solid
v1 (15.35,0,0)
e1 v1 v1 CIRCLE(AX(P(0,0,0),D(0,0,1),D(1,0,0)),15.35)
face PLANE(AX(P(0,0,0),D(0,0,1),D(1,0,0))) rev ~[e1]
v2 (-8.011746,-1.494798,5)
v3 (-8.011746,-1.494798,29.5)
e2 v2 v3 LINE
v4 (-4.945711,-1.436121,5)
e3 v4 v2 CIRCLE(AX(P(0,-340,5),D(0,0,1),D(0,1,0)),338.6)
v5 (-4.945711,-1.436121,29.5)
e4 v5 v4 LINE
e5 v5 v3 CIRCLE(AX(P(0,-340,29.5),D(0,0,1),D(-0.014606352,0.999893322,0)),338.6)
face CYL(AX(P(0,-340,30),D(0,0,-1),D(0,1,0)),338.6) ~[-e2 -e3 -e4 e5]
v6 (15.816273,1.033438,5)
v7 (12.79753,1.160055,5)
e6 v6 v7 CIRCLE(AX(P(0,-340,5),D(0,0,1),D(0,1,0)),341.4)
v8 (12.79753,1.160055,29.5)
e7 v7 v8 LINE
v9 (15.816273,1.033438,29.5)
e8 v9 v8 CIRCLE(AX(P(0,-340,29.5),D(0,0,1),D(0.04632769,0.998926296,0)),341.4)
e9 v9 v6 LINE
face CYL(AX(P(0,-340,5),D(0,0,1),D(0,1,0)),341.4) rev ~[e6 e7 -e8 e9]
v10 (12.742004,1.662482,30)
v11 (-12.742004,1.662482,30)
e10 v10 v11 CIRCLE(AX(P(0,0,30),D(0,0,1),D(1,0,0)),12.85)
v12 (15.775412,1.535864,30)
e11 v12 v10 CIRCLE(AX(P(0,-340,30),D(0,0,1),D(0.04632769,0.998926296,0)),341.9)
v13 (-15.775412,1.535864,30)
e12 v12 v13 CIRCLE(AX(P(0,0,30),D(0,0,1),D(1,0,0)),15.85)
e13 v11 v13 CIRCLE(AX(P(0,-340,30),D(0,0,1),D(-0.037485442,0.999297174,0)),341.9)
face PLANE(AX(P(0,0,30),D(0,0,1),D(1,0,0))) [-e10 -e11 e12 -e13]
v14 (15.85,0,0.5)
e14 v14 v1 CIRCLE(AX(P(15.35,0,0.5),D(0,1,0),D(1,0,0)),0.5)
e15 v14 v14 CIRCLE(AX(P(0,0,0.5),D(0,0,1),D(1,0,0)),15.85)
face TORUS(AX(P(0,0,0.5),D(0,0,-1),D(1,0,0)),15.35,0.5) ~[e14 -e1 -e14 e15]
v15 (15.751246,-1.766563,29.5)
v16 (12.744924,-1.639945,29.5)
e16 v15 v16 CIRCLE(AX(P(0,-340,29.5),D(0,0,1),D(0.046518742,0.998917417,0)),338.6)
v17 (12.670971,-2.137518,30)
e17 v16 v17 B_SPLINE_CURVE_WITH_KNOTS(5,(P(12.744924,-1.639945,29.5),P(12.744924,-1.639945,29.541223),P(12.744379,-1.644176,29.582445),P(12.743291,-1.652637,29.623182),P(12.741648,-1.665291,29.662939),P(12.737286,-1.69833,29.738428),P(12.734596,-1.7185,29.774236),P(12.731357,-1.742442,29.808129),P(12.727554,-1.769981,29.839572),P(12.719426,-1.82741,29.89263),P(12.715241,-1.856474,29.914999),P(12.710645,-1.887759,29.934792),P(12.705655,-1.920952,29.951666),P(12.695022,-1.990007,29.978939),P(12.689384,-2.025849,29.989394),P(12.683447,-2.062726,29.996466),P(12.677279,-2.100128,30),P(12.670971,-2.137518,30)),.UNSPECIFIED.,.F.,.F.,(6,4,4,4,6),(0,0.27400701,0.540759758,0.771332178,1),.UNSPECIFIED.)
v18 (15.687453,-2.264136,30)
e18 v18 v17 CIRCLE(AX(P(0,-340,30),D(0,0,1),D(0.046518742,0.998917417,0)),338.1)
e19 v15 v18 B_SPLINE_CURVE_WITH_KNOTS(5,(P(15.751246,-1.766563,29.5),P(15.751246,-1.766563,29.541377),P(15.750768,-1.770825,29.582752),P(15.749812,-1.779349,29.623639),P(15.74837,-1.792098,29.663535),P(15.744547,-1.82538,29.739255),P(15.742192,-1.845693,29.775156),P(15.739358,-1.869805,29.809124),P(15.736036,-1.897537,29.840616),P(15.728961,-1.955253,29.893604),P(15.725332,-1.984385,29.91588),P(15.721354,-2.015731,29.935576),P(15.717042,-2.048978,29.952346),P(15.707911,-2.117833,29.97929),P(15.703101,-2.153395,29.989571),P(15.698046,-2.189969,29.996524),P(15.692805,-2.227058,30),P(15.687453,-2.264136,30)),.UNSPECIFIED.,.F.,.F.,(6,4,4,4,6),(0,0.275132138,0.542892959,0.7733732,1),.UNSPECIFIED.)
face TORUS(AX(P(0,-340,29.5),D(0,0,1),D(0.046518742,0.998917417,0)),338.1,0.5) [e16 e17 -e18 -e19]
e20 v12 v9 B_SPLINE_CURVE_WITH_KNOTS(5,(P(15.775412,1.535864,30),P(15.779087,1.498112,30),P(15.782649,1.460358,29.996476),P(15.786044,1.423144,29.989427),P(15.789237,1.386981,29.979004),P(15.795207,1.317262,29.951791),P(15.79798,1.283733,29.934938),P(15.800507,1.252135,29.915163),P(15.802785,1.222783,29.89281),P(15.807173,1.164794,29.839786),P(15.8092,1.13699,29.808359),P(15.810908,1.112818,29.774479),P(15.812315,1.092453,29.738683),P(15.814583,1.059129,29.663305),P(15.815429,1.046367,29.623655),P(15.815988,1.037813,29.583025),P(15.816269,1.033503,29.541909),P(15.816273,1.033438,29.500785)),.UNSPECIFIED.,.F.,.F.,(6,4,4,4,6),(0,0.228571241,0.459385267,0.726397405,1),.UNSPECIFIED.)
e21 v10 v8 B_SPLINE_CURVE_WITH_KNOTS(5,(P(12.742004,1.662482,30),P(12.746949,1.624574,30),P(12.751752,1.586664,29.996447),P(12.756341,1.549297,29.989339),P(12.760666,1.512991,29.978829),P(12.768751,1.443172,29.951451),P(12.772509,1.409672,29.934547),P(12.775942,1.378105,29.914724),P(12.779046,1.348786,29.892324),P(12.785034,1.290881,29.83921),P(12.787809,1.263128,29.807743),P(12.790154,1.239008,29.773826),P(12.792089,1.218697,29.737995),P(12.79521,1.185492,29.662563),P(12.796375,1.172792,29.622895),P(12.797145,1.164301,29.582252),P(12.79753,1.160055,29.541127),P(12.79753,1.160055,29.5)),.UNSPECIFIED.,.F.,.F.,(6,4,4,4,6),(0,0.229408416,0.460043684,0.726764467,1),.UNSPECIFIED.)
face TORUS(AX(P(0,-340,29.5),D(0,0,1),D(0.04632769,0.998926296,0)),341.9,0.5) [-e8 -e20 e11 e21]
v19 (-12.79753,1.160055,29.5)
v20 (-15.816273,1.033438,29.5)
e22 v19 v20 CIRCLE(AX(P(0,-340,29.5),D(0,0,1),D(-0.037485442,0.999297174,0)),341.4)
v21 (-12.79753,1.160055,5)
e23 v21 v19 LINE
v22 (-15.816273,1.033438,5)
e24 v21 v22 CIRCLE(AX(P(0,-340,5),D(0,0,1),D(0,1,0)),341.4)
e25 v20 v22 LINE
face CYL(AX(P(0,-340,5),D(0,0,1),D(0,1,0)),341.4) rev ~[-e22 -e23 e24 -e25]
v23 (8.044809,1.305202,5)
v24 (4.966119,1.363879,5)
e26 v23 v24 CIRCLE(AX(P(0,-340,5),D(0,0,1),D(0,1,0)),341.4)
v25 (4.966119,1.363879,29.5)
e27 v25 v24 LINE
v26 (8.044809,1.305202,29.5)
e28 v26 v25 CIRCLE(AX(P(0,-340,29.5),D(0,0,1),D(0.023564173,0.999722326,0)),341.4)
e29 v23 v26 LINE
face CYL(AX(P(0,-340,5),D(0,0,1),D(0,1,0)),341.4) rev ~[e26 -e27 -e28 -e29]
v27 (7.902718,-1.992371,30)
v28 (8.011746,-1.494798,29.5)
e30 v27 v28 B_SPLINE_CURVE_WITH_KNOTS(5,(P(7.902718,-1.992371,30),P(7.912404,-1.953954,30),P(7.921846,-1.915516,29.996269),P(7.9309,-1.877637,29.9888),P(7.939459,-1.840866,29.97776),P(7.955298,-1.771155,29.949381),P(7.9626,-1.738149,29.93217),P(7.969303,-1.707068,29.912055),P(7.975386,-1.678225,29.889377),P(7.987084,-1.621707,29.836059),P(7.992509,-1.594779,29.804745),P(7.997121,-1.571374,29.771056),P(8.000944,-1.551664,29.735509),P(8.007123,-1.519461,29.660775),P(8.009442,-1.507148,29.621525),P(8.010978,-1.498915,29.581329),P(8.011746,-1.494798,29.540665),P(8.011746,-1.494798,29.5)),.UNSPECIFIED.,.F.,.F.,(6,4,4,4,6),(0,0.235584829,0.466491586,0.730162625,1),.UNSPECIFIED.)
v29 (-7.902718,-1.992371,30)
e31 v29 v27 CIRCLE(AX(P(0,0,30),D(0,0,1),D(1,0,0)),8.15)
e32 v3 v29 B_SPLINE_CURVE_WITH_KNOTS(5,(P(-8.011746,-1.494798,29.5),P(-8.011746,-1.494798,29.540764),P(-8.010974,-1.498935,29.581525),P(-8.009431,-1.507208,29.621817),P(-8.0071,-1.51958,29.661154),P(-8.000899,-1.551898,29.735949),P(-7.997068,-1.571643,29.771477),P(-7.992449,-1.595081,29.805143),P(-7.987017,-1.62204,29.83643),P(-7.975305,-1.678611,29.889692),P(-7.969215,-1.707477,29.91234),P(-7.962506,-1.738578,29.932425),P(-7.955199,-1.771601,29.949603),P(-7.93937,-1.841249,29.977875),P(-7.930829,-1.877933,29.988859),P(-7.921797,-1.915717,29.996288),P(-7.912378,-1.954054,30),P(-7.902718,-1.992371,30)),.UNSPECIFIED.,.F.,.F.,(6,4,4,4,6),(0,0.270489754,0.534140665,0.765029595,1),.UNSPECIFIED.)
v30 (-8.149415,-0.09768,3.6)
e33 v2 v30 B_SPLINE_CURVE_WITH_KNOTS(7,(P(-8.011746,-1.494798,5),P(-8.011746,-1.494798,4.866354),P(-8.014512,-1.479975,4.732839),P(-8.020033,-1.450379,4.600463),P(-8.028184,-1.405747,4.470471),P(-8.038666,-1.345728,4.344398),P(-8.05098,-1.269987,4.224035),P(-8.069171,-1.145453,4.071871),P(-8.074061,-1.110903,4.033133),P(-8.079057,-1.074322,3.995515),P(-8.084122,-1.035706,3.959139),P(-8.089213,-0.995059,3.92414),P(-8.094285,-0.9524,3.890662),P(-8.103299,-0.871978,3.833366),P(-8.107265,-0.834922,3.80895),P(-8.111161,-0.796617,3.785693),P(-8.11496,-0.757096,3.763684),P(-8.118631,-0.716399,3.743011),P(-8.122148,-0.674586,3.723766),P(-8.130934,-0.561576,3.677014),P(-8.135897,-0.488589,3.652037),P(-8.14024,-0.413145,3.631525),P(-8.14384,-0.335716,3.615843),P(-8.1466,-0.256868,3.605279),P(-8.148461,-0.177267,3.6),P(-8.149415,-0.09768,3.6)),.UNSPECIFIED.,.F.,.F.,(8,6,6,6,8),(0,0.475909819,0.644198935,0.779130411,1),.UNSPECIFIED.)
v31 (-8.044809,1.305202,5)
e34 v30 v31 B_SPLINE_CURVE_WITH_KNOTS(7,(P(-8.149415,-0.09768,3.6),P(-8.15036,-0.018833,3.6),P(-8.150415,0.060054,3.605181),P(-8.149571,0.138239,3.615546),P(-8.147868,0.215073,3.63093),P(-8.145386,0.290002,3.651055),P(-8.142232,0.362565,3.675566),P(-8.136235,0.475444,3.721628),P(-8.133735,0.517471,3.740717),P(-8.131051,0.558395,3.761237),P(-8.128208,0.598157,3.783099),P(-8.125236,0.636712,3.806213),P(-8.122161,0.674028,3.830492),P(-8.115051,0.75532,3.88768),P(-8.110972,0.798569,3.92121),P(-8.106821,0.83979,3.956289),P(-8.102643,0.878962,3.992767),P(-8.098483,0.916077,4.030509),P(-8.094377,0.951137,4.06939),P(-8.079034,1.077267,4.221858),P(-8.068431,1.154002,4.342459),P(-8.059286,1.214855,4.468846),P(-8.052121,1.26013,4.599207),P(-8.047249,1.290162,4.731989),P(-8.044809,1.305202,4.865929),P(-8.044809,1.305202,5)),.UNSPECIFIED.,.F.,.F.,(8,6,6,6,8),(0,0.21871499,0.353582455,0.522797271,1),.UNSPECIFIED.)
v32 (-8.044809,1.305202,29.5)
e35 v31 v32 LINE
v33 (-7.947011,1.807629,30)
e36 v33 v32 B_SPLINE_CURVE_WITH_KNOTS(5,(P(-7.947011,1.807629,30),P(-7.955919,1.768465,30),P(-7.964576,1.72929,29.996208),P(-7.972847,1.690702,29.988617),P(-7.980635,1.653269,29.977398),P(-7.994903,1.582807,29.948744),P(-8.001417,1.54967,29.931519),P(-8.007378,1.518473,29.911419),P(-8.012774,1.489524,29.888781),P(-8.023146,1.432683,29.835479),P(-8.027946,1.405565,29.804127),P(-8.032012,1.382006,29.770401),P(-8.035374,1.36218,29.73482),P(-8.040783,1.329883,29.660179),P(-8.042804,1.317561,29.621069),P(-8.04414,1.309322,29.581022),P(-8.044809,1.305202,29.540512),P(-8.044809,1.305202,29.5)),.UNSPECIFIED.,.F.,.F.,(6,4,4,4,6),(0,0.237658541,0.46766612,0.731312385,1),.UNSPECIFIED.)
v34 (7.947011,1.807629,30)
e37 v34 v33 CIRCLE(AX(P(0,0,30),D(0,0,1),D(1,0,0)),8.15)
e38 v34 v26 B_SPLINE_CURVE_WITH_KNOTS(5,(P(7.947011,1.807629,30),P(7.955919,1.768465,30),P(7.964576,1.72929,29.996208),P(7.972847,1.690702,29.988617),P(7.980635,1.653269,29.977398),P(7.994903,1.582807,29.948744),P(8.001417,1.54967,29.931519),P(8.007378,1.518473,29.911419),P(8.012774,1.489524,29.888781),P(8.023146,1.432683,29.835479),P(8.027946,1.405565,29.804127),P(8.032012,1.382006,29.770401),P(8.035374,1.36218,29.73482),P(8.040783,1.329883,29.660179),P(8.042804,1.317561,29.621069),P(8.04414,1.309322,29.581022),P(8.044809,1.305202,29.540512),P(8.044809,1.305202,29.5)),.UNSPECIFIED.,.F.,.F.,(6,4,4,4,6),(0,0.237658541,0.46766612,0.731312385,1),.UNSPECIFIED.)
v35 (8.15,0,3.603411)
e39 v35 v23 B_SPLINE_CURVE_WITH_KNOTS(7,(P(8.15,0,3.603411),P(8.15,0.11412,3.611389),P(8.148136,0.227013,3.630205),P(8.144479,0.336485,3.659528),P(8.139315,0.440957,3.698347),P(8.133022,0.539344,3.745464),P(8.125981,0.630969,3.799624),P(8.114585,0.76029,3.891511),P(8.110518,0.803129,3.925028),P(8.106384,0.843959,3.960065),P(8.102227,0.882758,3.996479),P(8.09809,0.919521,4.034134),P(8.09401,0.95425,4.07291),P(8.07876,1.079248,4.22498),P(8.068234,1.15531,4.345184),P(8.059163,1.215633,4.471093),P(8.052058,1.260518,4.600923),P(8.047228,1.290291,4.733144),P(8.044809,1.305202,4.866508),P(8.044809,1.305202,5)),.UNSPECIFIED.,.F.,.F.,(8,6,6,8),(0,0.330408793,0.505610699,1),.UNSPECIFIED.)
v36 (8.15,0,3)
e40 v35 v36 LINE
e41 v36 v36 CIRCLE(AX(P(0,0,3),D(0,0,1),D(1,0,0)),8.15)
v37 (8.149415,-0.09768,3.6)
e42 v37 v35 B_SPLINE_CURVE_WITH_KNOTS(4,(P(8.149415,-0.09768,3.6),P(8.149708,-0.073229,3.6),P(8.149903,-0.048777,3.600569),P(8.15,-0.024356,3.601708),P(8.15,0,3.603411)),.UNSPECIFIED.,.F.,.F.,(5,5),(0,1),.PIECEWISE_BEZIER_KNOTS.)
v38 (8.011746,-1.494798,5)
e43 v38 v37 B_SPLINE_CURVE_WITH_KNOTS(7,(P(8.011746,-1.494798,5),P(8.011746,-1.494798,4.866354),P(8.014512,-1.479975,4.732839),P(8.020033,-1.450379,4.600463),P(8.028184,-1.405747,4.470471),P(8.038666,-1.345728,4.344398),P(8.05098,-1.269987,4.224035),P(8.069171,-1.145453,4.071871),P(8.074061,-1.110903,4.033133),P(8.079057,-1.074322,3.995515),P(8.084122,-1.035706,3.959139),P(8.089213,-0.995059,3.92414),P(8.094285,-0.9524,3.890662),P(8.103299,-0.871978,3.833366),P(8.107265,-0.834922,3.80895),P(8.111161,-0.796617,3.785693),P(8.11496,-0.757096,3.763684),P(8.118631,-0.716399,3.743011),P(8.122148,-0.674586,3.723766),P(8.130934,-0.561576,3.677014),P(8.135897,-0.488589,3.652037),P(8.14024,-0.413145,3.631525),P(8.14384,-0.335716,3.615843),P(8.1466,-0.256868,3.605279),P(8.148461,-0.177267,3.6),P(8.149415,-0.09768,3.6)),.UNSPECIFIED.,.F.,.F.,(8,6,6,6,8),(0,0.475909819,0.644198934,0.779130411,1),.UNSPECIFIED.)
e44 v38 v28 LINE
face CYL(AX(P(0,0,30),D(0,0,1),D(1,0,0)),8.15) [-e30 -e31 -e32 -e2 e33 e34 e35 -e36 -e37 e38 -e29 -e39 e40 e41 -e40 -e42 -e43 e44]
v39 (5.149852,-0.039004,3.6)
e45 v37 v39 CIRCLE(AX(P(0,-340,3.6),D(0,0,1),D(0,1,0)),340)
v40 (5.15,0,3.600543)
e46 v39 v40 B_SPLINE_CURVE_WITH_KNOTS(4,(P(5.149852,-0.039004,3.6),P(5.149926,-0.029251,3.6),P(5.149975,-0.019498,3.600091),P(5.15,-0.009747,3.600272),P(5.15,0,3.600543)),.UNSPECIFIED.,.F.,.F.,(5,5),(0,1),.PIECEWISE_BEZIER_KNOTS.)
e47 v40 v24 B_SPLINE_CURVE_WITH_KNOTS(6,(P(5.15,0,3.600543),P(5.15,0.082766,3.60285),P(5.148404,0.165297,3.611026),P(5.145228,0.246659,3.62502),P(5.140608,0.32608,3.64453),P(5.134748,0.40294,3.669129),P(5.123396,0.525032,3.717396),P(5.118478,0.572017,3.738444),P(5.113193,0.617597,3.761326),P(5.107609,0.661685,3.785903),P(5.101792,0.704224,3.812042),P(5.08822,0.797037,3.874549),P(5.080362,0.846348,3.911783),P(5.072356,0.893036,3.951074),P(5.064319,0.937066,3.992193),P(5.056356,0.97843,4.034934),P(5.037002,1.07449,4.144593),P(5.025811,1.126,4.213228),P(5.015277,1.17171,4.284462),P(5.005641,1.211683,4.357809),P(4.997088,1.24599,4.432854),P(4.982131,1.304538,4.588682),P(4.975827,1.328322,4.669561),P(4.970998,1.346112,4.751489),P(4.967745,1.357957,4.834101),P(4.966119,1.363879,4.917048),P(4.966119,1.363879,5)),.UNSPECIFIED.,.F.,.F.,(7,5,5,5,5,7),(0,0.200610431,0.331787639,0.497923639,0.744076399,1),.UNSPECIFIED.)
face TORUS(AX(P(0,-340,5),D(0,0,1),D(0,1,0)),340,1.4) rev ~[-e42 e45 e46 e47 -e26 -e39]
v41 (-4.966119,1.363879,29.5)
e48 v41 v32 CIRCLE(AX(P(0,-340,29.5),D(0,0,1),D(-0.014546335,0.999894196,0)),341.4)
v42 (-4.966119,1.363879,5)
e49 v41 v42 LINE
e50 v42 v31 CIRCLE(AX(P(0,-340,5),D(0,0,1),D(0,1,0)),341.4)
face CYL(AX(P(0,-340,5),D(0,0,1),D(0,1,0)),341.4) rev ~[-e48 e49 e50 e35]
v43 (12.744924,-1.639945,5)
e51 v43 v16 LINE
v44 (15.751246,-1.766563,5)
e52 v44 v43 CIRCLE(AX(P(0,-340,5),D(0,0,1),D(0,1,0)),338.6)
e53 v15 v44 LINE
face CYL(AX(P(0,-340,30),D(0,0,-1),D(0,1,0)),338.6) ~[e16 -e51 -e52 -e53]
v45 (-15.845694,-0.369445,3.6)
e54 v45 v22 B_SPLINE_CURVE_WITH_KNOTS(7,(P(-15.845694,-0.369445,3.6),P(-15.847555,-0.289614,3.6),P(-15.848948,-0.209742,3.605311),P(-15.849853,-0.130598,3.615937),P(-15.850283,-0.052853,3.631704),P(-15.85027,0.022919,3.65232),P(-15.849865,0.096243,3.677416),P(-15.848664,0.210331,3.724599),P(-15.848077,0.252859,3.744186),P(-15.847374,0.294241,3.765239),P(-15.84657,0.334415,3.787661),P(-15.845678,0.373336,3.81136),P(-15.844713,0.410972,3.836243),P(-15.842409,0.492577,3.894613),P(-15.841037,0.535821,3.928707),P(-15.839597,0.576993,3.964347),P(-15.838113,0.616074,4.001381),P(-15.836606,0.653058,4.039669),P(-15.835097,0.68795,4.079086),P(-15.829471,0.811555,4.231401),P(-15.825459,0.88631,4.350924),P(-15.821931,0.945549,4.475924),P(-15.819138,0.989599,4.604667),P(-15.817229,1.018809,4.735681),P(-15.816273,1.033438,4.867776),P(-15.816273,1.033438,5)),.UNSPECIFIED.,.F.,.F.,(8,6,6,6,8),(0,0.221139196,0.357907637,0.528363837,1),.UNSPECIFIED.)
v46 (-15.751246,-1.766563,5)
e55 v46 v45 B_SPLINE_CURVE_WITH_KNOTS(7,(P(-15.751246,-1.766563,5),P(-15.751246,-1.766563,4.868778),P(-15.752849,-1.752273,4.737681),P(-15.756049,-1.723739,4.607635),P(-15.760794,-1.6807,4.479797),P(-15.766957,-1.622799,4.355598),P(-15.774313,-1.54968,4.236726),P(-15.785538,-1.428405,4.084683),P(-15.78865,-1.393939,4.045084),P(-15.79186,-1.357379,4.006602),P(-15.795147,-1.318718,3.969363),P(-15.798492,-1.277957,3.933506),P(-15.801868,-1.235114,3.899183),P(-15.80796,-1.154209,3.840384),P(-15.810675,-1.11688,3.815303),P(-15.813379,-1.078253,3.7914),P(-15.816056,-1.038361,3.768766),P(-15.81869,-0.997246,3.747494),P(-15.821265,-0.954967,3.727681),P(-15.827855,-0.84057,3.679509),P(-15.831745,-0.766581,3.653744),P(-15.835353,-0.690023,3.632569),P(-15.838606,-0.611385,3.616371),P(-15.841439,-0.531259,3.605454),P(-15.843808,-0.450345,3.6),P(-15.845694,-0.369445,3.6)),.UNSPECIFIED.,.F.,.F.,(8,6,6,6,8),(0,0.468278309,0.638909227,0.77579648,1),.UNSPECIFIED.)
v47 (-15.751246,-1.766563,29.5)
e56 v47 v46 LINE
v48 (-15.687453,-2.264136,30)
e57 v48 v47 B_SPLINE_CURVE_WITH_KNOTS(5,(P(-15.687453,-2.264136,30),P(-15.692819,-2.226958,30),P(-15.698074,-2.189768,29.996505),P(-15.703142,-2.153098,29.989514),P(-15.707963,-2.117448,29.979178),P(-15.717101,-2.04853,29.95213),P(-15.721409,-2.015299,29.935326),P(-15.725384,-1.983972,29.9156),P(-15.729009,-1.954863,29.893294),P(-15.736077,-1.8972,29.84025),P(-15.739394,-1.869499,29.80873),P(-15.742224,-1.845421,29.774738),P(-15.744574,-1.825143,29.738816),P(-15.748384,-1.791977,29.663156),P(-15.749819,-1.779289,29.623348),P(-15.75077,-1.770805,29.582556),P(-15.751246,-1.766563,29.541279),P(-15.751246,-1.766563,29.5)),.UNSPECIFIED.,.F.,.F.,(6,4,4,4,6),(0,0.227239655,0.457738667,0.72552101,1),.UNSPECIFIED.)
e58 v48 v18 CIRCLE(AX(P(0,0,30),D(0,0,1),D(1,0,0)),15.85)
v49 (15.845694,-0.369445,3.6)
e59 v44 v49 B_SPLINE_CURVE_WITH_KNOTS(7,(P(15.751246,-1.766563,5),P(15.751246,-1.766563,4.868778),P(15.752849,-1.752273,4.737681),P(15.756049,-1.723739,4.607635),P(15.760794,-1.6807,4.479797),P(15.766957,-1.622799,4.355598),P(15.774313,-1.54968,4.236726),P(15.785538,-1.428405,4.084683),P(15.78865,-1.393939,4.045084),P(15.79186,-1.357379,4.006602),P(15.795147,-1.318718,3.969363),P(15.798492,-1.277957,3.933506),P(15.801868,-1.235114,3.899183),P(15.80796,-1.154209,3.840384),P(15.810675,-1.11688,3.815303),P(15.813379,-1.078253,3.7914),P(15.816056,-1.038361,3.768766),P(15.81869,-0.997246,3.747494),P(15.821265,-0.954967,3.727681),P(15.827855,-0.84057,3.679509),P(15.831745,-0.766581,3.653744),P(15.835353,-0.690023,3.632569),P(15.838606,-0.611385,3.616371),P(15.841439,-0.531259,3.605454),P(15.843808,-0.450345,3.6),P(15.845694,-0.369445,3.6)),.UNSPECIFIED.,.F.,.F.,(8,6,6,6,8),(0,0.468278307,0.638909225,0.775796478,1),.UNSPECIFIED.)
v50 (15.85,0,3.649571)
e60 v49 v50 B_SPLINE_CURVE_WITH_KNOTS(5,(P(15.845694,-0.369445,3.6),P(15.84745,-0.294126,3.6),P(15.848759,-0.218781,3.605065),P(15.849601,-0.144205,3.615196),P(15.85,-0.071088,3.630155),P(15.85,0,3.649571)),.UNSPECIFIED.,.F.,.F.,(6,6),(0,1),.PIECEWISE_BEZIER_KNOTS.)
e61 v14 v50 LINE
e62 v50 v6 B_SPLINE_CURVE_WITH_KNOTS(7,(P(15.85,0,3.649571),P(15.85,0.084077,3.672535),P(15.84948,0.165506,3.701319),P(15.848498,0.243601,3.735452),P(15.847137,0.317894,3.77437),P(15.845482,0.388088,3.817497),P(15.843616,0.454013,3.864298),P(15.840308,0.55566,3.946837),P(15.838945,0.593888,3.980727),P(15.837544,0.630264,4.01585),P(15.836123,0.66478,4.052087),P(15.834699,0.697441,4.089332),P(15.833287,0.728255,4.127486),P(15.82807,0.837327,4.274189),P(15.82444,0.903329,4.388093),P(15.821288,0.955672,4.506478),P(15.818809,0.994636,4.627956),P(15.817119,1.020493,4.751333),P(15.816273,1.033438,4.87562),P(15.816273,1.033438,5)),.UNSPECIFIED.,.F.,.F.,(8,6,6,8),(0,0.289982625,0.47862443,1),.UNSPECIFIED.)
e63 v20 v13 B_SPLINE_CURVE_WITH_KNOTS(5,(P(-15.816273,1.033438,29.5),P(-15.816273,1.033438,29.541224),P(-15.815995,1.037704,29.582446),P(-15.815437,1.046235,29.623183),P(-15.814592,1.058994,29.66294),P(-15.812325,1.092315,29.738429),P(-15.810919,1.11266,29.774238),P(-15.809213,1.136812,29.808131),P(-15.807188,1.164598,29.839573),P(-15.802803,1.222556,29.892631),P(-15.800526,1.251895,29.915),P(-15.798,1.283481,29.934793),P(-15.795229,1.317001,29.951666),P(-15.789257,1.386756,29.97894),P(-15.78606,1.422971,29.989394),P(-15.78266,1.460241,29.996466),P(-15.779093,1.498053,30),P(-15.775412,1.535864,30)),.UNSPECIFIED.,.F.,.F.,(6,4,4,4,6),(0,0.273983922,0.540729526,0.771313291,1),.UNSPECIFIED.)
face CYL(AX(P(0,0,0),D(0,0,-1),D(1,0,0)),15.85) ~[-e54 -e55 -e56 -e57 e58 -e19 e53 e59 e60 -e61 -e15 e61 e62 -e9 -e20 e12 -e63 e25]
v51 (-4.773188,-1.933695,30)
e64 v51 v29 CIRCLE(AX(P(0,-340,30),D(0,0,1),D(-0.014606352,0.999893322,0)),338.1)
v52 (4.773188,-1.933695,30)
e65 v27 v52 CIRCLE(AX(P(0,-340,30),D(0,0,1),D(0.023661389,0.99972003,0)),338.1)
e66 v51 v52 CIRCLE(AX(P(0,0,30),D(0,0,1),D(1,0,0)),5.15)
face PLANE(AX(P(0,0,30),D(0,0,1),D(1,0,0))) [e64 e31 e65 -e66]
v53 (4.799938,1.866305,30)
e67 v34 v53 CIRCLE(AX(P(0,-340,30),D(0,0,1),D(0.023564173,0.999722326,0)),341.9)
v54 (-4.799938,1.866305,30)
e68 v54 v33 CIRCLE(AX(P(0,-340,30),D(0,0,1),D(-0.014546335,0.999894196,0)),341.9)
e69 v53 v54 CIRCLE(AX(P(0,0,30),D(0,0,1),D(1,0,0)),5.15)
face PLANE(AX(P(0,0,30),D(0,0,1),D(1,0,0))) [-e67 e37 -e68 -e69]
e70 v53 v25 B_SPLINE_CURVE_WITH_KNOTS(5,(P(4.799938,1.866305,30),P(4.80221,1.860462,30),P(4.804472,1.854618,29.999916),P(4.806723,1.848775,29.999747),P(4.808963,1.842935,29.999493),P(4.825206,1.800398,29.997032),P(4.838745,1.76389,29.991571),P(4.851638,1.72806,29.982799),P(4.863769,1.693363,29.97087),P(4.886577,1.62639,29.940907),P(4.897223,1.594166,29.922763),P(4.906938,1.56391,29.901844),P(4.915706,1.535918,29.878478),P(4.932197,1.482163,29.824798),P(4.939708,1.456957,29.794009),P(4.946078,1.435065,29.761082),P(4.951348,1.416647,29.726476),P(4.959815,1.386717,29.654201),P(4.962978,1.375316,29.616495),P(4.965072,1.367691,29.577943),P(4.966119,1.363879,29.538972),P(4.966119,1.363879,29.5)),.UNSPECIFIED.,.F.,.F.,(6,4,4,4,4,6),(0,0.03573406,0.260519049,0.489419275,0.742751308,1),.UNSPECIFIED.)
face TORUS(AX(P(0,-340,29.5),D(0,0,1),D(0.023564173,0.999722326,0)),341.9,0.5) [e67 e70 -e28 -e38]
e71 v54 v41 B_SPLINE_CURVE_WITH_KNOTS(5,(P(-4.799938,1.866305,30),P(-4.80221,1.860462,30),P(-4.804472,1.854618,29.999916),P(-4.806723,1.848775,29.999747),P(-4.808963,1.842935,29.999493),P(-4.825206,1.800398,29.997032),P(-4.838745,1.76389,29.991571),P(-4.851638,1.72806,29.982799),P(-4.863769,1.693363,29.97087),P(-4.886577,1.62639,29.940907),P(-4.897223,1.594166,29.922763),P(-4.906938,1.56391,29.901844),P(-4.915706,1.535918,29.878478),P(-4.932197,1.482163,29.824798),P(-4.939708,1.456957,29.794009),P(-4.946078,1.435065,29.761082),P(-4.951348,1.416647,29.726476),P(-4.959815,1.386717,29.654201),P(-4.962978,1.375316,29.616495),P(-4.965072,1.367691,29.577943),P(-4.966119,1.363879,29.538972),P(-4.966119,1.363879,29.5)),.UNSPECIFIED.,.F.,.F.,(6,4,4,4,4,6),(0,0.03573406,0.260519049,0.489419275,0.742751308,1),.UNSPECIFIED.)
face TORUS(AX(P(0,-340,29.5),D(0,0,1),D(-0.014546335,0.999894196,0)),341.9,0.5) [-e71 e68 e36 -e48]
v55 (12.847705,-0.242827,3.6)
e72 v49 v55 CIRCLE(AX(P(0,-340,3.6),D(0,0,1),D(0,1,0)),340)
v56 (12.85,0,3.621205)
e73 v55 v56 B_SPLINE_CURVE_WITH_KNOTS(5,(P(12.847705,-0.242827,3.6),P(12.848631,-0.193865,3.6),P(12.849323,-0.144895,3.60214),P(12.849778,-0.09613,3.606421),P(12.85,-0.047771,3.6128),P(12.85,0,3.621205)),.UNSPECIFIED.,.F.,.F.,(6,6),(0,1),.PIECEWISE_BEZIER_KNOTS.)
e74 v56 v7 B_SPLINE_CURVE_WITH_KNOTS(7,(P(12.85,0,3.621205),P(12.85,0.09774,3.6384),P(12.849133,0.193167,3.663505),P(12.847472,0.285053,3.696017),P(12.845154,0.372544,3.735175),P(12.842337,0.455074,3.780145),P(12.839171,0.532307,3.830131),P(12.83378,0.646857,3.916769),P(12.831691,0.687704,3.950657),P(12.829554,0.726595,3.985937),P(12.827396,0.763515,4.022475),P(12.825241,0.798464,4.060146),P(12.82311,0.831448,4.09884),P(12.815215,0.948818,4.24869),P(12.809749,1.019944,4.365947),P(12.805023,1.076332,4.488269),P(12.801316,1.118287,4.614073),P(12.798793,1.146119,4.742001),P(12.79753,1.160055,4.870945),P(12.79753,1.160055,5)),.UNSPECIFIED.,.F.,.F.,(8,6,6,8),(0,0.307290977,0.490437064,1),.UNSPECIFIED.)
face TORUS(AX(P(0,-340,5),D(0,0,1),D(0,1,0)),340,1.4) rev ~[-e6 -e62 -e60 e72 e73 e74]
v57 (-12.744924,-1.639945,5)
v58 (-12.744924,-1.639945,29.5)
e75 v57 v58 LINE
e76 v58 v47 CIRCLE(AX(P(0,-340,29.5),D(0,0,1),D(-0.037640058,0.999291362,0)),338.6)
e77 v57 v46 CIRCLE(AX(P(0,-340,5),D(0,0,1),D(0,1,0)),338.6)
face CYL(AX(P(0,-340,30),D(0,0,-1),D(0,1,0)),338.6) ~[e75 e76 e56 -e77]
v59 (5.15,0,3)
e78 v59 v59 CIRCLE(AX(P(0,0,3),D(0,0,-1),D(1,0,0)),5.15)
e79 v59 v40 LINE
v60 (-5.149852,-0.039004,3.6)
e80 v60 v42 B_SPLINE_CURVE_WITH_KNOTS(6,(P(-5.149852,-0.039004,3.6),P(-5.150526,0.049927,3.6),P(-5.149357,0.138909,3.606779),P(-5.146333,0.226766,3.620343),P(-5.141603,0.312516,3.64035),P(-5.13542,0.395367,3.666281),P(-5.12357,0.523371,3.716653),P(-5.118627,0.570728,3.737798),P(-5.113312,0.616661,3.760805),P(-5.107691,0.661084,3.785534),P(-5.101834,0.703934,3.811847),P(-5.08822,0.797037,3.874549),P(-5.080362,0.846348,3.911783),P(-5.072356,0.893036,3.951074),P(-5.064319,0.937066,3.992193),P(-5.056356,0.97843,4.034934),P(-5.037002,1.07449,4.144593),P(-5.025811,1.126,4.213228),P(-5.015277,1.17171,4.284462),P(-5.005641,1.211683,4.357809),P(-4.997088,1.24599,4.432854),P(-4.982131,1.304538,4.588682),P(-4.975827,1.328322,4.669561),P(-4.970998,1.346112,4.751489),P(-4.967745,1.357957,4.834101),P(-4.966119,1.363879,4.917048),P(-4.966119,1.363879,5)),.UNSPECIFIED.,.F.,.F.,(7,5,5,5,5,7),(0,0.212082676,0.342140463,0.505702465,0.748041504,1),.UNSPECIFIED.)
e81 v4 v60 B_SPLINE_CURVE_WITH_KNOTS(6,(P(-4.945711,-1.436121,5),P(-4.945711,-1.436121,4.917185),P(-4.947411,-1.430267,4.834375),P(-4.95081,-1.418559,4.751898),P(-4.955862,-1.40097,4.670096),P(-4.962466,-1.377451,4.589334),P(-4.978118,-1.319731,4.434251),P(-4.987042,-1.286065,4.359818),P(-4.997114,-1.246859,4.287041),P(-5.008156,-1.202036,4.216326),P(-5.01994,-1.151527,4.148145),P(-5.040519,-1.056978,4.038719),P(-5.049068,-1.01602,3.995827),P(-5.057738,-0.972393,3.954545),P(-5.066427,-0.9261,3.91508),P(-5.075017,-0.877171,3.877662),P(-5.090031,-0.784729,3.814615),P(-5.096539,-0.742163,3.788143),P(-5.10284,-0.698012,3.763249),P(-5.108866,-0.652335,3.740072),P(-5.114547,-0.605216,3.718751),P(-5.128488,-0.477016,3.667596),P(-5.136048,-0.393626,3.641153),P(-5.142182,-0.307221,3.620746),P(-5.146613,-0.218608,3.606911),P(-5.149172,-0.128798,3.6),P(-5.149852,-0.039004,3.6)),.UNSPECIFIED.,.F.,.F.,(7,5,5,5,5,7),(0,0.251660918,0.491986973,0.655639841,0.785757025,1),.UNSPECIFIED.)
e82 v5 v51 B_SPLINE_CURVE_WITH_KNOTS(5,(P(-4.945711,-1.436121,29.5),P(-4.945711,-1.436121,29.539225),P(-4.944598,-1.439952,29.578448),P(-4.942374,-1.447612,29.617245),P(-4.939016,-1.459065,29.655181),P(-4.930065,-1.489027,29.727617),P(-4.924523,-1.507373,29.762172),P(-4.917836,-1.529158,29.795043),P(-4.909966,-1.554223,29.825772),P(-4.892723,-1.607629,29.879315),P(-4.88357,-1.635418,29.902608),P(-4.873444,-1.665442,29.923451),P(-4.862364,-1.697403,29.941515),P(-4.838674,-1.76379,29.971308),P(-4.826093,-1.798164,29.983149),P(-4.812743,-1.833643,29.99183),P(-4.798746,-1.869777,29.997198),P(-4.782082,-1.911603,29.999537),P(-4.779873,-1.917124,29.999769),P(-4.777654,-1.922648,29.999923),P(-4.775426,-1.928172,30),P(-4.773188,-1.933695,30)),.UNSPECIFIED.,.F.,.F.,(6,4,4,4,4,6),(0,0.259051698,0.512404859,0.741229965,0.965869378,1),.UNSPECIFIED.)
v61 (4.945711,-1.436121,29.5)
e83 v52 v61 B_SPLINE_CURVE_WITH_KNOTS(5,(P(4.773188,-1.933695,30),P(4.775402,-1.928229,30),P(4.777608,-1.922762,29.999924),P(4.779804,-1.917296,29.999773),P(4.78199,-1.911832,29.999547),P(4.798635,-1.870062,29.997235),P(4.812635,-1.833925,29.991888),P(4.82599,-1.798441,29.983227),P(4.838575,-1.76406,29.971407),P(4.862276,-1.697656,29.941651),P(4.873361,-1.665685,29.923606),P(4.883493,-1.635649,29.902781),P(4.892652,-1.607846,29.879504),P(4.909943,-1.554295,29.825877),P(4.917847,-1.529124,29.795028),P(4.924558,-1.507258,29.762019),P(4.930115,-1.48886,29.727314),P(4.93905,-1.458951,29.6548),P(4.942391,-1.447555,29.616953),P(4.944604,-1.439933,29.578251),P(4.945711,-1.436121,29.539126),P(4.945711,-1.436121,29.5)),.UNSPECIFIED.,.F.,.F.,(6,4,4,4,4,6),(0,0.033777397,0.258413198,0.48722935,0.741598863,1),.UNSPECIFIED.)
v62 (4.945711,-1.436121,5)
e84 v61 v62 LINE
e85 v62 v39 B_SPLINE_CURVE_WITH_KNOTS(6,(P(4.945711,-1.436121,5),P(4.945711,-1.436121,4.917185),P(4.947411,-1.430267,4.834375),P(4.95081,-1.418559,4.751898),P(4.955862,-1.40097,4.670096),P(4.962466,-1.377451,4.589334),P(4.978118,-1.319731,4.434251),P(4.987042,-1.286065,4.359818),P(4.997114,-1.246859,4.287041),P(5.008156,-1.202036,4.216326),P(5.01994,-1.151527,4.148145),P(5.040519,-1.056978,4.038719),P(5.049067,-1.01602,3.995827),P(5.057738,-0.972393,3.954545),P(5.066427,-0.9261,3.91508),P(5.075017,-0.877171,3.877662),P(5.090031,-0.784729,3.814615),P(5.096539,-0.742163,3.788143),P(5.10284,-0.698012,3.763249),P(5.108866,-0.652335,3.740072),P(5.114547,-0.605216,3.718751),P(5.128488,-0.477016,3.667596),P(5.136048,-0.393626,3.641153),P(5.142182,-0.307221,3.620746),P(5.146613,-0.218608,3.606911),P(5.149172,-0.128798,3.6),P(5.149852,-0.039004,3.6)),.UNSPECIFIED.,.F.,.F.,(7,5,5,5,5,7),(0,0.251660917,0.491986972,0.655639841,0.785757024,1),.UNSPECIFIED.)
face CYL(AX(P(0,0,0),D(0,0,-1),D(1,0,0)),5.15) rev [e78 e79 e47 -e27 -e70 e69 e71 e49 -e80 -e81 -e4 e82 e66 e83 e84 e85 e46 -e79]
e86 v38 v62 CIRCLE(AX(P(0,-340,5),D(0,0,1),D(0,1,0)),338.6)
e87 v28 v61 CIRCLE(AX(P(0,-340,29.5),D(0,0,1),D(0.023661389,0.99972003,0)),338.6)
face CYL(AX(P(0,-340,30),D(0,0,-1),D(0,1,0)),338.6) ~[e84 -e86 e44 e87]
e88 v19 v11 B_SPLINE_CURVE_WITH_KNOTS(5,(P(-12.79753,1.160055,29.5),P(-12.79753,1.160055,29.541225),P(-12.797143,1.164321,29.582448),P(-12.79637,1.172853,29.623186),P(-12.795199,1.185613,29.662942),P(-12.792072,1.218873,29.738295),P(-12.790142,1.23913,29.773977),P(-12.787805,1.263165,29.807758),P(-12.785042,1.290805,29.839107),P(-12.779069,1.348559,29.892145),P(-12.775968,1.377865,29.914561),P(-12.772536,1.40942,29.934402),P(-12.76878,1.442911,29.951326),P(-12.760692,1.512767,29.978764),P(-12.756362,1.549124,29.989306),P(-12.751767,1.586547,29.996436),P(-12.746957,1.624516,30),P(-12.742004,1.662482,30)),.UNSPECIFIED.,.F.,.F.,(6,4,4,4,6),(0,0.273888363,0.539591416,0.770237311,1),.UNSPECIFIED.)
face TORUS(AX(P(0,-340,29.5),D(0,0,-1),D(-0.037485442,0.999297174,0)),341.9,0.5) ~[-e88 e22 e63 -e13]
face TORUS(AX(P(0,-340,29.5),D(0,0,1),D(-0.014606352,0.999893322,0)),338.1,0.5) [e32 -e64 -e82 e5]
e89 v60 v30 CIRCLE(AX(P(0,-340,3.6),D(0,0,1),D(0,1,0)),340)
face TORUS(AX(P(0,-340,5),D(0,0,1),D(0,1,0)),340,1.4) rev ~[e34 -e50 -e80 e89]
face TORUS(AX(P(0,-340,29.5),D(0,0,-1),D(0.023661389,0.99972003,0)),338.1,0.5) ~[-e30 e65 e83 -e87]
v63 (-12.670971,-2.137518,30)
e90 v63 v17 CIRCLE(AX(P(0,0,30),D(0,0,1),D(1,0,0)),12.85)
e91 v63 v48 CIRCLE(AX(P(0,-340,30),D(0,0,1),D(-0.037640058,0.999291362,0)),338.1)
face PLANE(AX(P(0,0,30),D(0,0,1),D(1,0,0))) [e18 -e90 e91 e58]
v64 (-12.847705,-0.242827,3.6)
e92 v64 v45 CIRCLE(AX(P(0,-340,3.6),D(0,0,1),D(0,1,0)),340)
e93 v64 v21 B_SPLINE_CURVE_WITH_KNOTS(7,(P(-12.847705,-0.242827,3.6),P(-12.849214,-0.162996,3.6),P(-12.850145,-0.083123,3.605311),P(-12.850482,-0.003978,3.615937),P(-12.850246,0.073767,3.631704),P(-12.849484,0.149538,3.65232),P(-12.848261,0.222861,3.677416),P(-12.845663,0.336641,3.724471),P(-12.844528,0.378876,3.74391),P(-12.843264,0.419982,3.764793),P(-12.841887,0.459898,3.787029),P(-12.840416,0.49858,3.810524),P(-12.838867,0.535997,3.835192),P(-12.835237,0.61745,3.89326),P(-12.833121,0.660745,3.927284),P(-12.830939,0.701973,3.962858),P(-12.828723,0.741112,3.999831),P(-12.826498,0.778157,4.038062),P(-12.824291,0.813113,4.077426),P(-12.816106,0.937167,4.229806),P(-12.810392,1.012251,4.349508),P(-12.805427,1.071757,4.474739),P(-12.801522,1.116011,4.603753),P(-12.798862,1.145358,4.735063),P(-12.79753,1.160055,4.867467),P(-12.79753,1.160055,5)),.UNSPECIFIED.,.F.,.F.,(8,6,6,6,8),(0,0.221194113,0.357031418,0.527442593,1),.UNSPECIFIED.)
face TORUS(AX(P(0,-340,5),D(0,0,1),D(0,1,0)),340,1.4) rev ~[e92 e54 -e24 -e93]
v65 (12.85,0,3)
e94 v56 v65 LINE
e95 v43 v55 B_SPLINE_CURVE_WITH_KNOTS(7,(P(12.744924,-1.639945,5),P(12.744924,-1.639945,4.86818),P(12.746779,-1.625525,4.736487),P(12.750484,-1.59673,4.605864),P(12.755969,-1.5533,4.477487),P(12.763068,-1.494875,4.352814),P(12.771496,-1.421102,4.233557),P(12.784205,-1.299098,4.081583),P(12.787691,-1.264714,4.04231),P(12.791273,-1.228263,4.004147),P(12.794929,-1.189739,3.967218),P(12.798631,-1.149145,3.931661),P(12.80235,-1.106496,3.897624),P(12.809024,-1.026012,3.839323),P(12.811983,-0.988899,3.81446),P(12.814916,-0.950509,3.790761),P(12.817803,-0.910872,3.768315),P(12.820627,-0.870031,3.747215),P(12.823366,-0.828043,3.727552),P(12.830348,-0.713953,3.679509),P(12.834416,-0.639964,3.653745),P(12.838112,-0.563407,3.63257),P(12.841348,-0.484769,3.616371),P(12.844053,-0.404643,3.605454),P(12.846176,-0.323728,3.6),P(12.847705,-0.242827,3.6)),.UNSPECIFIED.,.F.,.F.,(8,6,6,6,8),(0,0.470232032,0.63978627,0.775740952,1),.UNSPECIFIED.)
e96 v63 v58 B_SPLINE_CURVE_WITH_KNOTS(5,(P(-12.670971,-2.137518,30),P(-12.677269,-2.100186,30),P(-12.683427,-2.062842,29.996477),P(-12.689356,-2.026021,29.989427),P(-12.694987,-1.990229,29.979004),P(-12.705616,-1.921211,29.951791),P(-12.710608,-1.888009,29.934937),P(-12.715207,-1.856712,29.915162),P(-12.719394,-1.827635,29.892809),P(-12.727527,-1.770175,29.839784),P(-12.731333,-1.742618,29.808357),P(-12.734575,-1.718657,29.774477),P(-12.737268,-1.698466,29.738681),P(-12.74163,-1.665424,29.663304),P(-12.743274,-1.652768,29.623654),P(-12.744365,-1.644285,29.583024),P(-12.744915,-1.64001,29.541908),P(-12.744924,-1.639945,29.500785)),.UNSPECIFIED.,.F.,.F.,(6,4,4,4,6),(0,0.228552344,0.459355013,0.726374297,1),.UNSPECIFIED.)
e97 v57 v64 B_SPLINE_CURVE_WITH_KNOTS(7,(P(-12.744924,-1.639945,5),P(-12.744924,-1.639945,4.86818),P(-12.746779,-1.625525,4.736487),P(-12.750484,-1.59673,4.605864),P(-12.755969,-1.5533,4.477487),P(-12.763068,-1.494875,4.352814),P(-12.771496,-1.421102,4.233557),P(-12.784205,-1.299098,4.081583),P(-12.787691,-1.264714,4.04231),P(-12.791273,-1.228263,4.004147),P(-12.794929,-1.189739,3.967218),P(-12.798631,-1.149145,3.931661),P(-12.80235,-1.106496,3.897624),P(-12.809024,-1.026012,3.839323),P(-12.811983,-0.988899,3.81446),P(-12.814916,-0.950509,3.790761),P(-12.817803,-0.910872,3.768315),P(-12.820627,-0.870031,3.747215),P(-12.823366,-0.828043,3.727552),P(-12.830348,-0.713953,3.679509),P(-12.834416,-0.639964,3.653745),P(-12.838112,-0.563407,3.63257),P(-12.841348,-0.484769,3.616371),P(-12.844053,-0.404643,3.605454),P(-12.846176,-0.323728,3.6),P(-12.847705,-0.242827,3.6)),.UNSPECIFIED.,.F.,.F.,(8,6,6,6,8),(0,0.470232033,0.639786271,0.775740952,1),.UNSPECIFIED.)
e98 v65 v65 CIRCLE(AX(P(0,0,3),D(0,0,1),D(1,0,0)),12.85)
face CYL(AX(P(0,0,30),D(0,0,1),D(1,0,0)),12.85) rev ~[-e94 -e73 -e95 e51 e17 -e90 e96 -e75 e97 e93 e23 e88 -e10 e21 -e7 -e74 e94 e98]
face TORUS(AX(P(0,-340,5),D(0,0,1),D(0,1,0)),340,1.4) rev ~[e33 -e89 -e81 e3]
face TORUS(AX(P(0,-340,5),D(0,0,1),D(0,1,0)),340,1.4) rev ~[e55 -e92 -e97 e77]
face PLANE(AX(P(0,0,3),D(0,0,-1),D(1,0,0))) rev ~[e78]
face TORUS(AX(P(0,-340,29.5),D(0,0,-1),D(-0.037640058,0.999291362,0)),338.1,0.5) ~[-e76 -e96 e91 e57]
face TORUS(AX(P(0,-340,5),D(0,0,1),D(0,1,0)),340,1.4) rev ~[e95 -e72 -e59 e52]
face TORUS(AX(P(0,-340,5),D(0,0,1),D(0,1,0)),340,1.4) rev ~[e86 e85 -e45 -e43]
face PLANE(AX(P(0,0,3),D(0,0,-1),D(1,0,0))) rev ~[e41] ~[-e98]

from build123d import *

# Parameters (mm, degrees)
F0_R      = 15.85
F0_R_2    = 5.15
F1_DEPTH  = 30
F2_R      = 12.85
F2_R_2    = 8.15
F3_DEPTH  = 40
F4_R      = 12.65
F4_R_2    = 8.9
F5_DEPTH  = 40
F10_R     = 0.5
F11_R     = 15.35
F12_DEPTH = 3


# Not quite as in the source:
# - a feature names something its author has since deleted; it is built from what else it names


with BuildPart() as f1:
    # F0 (on Top) → F1 (new body)
    with BuildSketch(Plane.XY):
        Circle(F0_R)
        Circle(F0_R_2, mode=Mode.SUBTRACT)
    extrude(amount=F1_DEPTH)

    # F2 (on face) → F3 (cut)
    with BuildSketch(Plane.XY.offset(30)):
        Circle(F2_R)
        Circle(F2_R_2, mode=Mode.SUBTRACT)
    extrude(amount=-F3_DEPTH, mode=Mode.SUBTRACT)

    # F4 (on face) → F5 (cut)
    with BuildSketch(Plane(origin=(0, 0, 0), x_dir=(1, 0, 0), z_dir=(0, 0, -1))):
        Circle(F4_R)
        Circle(F4_R_2, mode=Mode.SUBTRACT)
    extrude(amount=-F5_DEPTH, mode=Mode.SUBTRACT)

    # F7 (on Right) → F9 (revolve, cut)
    with BuildSketch(Plane.YZ):
        with BuildLine():
            Line((1.4, 5), (1.4, 30))
            Line((1.4, 30), (0, 30))
            Line((0, 30), (-1.4, 30))
            Line((-1.4, 30), (-1.4, 5))
            ThreePointArc((-1.4, 5), (-0.9899494937, 4.0100505063), (0, 3.6))
            ThreePointArc((0, 3.6), (0.9899494937, 4.0100505063), (1.4, 5))
        make_face()
    revolve(axis=Axis((0, -340, 29.7196172178), (0, 0, 1)), mode=Mode.SUBTRACT)

    # F10
    f10_edges = [f1.edges().sort_by_distance(p)[0] for p in [
        (-14.307042, 1.100086, 30),
        (14.307042, 1.100086, 30),
        (6.50553, 1.338011, 30),
        (-6.50553, 1.338011, 30),
        (14.248226, -1.699914, 30),
        (-14.248226, -1.699914, 30),
        (-6.478795, -1.461989, 30),
        (6.478795, -1.461989, 30),
        (-15.85, 0, 0),
    ]]
    fillet(f10_edges, radius=F10_R)

    # F11 (on face) → F12 (join)
    with BuildSketch(Plane(origin=(0, 0, 0), x_dir=(1, 0, 0), z_dir=(0, 0, -1))):
        Circle(F11_R)
    extrude(amount=-F12_DEPTH)


solid = f1.part
